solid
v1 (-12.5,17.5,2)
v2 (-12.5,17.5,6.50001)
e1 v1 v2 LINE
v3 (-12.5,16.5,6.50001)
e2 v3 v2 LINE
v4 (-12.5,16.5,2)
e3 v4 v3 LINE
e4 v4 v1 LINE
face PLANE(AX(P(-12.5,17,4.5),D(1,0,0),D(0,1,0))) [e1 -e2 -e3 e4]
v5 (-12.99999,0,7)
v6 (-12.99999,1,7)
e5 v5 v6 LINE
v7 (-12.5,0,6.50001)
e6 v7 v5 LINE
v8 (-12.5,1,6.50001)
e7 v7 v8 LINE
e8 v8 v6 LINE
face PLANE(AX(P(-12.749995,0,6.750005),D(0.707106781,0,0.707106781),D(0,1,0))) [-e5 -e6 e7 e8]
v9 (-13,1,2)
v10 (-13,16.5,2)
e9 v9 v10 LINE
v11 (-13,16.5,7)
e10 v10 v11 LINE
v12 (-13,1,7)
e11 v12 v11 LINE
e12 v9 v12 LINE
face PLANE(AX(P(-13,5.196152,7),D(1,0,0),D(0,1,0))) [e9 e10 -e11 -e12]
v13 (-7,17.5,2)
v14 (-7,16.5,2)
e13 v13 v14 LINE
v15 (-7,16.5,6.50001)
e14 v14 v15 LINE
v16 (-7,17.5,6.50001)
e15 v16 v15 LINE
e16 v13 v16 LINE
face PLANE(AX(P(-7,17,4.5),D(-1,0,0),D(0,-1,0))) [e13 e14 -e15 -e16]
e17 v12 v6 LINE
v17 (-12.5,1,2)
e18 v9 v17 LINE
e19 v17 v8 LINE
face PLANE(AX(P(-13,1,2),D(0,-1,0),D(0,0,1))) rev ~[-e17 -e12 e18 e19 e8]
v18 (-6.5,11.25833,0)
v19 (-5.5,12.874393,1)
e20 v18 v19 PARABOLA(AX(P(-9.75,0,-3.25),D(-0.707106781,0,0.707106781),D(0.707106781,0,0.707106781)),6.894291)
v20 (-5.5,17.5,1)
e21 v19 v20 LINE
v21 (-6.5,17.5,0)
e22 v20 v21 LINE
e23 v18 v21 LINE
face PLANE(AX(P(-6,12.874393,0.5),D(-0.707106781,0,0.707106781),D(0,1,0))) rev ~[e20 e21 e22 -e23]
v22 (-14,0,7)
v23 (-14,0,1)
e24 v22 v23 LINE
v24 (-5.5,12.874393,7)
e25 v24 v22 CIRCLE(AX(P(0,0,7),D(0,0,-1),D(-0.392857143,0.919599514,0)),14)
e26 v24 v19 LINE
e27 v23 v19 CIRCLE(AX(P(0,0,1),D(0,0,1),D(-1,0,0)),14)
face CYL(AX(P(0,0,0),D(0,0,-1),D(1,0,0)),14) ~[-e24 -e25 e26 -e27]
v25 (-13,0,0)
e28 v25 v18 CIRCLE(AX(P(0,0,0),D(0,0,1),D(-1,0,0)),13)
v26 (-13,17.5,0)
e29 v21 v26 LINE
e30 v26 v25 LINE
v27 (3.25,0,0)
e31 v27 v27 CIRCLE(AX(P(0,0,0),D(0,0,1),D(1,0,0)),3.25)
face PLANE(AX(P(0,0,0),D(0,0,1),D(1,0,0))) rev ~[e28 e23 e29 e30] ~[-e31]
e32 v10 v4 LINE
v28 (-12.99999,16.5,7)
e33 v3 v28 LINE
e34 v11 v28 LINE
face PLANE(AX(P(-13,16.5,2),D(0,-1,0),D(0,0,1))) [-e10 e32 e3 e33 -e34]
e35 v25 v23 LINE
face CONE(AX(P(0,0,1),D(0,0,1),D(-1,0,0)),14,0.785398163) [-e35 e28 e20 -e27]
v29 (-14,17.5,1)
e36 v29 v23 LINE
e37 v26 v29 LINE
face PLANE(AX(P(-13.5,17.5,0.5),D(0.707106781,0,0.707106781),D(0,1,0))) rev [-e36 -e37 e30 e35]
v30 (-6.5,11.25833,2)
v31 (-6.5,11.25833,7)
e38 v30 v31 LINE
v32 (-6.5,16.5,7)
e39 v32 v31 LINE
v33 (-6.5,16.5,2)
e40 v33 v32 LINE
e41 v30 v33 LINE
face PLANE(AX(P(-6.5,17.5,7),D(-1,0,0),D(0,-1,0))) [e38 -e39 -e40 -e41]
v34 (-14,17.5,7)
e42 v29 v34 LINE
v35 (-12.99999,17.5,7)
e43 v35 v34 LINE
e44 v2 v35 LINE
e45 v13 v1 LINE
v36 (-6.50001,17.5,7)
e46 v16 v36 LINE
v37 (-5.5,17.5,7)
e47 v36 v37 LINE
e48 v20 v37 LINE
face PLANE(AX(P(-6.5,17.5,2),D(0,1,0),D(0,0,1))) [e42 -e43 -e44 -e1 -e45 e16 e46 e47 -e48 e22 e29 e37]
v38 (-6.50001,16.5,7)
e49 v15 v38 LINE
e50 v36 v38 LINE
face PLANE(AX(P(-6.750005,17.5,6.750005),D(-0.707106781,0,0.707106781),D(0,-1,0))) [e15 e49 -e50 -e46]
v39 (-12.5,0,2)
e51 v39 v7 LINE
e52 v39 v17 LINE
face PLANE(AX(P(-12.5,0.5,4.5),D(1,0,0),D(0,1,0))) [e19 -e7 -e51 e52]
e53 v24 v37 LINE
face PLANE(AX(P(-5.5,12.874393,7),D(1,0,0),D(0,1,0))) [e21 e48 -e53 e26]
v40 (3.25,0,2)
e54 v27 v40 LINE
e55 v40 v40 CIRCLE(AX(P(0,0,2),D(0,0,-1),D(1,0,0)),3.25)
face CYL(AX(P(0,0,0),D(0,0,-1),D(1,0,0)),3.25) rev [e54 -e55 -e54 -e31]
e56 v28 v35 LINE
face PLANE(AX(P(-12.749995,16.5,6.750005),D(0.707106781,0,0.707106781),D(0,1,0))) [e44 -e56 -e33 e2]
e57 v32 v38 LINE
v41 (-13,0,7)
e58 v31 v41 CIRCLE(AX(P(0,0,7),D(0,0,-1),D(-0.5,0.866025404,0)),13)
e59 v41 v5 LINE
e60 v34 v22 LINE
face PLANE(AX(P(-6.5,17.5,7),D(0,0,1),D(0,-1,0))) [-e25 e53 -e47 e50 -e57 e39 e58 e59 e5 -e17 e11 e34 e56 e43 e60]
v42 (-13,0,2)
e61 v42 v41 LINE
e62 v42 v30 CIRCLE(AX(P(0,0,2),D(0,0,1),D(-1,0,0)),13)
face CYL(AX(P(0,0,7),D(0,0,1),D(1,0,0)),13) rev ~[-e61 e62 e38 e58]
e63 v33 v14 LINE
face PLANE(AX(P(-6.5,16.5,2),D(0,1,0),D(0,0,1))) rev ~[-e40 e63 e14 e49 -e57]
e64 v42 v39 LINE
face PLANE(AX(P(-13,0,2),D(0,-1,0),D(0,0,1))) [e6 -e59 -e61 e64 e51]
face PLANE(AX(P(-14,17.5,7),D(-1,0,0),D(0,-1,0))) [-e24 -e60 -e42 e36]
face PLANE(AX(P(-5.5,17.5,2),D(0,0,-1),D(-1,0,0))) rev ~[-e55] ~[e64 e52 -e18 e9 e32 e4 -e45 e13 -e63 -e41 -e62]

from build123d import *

# Parameters (mm, degrees)
F0_R      = 14
F0_R_2    = 3.25
F1_DEPTH  = 7
F2_R      = 13
F3_DEPTH  = 5
F5_DEPTH  = 7
F6_W      = 8.5
F6_H      = 2
F7_DEPTH  = 12.8
F8_W      = 6.5
F8_H      = 5
F9_DEPTH  = 17.5
F10_W     = 1
F10_H     = 5
F11_DEPTH = 0.5
F12_W     = 1
F12_H     = 5
F13_DEPTH = 0.5
F14_SIZE  = 0.49999
F15_SIZE  = 1


# Not quite as in the source:
# - a fillet or chamfer is up to 0.001 mm smaller than in the source, because OpenCascade refuses the exact size


with BuildPart() as f1:
    # F0 (on Top) → F1 (new body)
    with BuildSketch(Plane.XY):
        Circle(F0_R)
        Circle(F0_R_2, mode=Mode.SUBTRACT)
    extrude(amount=F1_DEPTH)

    # F2 (on face) → F3 (cut)
    with BuildSketch(Plane.XY.offset(7)):
        Circle(F2_R)
    extrude(amount=-F3_DEPTH, mode=Mode.SUBTRACT)

    # F4 (on face) → F5 (join)
    with BuildSketch(Plane.XY.offset(7)):
        with BuildLine():
            Line((-14, 17.5), (-14, 0))
            ThreePointArc((-14, 0), (-13.7477270849, 2.6457513111), (-13, 5.1961524227))
            Line((-13, 5.1961524227), (-13, 17.5))
            Line((-13, 17.5), (-14, 17.5))
        make_face()
        with BuildLine():
            ThreePointArc((-6.5, 12.3995967676), (-6.0046946559, 12.6468827024), (-5.5, 12.8743931896))
            Line((-5.5, 12.8743931896), (-5.5, 17.5))
            Line((-5.5, 17.5), (-6.5, 17.5))
            Line((-6.5, 17.5), (-6.5, 12.3995967676))
        make_face()
    extrude(amount=-F5_DEPTH)

    # F6 (on face) → F7 (join)
    with BuildSketch(Plane(origin=(0, 17.5, 0), x_dir=(-1, 0, 0), z_dir=(0, 1, 0))):
        with Locations((9.75, 1)):
            Rectangle(F6_W, F6_H)
    extrude(amount=-F7_DEPTH)

    # F8 (on face) → F9 (cut)
    with BuildSketch(Plane(origin=(0, 17.5, 0), x_dir=(-1, 0, 0), z_dir=(0, 1, 0))):
        with Locations((9.75, 4.5)):
            Rectangle(F8_W, F8_H)
    extrude(amount=-F9_DEPTH, mode=Mode.SUBTRACT)

    # F10 (on face) → F11 (join)
    with BuildSketch(Plane.YZ.offset(-13)):
        with Locations((0.5, 4.5)):
            Rectangle(F10_W, F10_H)
        with Locations((17, 4.5)):
            Rectangle(F10_W, F10_H)
    extrude(amount=F11_DEPTH)

    # F12 (on face) → F13 (join)
    with BuildSketch(Plane(origin=(-6.5, 0, 0), x_dir=(0, -1, 0), z_dir=(-1, 0, 0))):
        with Locations((-17, 4.5)):
            Rectangle(F12_W, F12_H)
    extrude(amount=F13_DEPTH)

    # F14 (size 0.5 in the source; OpenCascade refuses exactly that, so slightly less here)
    f14_edges = [f1.edges().sort_by_distance(p)[0] for p in [
        (-12.5, 0.5, 7),
        (-12.5, 17, 7),
        (-7, 17, 7),
    ]]
    chamfer(f14_edges, length=F14_SIZE)

    # F15
    f15_edges = [f1.edges().sort_by_distance(p)[0] for p in [
        (11.683321, -7.713624, 0),
        (-5.5, 15.187197, 0),
        (-14, 8.75, 0),
    ]]
    chamfer(f15_edges, length=F15_SIZE)


solid = f1.part
